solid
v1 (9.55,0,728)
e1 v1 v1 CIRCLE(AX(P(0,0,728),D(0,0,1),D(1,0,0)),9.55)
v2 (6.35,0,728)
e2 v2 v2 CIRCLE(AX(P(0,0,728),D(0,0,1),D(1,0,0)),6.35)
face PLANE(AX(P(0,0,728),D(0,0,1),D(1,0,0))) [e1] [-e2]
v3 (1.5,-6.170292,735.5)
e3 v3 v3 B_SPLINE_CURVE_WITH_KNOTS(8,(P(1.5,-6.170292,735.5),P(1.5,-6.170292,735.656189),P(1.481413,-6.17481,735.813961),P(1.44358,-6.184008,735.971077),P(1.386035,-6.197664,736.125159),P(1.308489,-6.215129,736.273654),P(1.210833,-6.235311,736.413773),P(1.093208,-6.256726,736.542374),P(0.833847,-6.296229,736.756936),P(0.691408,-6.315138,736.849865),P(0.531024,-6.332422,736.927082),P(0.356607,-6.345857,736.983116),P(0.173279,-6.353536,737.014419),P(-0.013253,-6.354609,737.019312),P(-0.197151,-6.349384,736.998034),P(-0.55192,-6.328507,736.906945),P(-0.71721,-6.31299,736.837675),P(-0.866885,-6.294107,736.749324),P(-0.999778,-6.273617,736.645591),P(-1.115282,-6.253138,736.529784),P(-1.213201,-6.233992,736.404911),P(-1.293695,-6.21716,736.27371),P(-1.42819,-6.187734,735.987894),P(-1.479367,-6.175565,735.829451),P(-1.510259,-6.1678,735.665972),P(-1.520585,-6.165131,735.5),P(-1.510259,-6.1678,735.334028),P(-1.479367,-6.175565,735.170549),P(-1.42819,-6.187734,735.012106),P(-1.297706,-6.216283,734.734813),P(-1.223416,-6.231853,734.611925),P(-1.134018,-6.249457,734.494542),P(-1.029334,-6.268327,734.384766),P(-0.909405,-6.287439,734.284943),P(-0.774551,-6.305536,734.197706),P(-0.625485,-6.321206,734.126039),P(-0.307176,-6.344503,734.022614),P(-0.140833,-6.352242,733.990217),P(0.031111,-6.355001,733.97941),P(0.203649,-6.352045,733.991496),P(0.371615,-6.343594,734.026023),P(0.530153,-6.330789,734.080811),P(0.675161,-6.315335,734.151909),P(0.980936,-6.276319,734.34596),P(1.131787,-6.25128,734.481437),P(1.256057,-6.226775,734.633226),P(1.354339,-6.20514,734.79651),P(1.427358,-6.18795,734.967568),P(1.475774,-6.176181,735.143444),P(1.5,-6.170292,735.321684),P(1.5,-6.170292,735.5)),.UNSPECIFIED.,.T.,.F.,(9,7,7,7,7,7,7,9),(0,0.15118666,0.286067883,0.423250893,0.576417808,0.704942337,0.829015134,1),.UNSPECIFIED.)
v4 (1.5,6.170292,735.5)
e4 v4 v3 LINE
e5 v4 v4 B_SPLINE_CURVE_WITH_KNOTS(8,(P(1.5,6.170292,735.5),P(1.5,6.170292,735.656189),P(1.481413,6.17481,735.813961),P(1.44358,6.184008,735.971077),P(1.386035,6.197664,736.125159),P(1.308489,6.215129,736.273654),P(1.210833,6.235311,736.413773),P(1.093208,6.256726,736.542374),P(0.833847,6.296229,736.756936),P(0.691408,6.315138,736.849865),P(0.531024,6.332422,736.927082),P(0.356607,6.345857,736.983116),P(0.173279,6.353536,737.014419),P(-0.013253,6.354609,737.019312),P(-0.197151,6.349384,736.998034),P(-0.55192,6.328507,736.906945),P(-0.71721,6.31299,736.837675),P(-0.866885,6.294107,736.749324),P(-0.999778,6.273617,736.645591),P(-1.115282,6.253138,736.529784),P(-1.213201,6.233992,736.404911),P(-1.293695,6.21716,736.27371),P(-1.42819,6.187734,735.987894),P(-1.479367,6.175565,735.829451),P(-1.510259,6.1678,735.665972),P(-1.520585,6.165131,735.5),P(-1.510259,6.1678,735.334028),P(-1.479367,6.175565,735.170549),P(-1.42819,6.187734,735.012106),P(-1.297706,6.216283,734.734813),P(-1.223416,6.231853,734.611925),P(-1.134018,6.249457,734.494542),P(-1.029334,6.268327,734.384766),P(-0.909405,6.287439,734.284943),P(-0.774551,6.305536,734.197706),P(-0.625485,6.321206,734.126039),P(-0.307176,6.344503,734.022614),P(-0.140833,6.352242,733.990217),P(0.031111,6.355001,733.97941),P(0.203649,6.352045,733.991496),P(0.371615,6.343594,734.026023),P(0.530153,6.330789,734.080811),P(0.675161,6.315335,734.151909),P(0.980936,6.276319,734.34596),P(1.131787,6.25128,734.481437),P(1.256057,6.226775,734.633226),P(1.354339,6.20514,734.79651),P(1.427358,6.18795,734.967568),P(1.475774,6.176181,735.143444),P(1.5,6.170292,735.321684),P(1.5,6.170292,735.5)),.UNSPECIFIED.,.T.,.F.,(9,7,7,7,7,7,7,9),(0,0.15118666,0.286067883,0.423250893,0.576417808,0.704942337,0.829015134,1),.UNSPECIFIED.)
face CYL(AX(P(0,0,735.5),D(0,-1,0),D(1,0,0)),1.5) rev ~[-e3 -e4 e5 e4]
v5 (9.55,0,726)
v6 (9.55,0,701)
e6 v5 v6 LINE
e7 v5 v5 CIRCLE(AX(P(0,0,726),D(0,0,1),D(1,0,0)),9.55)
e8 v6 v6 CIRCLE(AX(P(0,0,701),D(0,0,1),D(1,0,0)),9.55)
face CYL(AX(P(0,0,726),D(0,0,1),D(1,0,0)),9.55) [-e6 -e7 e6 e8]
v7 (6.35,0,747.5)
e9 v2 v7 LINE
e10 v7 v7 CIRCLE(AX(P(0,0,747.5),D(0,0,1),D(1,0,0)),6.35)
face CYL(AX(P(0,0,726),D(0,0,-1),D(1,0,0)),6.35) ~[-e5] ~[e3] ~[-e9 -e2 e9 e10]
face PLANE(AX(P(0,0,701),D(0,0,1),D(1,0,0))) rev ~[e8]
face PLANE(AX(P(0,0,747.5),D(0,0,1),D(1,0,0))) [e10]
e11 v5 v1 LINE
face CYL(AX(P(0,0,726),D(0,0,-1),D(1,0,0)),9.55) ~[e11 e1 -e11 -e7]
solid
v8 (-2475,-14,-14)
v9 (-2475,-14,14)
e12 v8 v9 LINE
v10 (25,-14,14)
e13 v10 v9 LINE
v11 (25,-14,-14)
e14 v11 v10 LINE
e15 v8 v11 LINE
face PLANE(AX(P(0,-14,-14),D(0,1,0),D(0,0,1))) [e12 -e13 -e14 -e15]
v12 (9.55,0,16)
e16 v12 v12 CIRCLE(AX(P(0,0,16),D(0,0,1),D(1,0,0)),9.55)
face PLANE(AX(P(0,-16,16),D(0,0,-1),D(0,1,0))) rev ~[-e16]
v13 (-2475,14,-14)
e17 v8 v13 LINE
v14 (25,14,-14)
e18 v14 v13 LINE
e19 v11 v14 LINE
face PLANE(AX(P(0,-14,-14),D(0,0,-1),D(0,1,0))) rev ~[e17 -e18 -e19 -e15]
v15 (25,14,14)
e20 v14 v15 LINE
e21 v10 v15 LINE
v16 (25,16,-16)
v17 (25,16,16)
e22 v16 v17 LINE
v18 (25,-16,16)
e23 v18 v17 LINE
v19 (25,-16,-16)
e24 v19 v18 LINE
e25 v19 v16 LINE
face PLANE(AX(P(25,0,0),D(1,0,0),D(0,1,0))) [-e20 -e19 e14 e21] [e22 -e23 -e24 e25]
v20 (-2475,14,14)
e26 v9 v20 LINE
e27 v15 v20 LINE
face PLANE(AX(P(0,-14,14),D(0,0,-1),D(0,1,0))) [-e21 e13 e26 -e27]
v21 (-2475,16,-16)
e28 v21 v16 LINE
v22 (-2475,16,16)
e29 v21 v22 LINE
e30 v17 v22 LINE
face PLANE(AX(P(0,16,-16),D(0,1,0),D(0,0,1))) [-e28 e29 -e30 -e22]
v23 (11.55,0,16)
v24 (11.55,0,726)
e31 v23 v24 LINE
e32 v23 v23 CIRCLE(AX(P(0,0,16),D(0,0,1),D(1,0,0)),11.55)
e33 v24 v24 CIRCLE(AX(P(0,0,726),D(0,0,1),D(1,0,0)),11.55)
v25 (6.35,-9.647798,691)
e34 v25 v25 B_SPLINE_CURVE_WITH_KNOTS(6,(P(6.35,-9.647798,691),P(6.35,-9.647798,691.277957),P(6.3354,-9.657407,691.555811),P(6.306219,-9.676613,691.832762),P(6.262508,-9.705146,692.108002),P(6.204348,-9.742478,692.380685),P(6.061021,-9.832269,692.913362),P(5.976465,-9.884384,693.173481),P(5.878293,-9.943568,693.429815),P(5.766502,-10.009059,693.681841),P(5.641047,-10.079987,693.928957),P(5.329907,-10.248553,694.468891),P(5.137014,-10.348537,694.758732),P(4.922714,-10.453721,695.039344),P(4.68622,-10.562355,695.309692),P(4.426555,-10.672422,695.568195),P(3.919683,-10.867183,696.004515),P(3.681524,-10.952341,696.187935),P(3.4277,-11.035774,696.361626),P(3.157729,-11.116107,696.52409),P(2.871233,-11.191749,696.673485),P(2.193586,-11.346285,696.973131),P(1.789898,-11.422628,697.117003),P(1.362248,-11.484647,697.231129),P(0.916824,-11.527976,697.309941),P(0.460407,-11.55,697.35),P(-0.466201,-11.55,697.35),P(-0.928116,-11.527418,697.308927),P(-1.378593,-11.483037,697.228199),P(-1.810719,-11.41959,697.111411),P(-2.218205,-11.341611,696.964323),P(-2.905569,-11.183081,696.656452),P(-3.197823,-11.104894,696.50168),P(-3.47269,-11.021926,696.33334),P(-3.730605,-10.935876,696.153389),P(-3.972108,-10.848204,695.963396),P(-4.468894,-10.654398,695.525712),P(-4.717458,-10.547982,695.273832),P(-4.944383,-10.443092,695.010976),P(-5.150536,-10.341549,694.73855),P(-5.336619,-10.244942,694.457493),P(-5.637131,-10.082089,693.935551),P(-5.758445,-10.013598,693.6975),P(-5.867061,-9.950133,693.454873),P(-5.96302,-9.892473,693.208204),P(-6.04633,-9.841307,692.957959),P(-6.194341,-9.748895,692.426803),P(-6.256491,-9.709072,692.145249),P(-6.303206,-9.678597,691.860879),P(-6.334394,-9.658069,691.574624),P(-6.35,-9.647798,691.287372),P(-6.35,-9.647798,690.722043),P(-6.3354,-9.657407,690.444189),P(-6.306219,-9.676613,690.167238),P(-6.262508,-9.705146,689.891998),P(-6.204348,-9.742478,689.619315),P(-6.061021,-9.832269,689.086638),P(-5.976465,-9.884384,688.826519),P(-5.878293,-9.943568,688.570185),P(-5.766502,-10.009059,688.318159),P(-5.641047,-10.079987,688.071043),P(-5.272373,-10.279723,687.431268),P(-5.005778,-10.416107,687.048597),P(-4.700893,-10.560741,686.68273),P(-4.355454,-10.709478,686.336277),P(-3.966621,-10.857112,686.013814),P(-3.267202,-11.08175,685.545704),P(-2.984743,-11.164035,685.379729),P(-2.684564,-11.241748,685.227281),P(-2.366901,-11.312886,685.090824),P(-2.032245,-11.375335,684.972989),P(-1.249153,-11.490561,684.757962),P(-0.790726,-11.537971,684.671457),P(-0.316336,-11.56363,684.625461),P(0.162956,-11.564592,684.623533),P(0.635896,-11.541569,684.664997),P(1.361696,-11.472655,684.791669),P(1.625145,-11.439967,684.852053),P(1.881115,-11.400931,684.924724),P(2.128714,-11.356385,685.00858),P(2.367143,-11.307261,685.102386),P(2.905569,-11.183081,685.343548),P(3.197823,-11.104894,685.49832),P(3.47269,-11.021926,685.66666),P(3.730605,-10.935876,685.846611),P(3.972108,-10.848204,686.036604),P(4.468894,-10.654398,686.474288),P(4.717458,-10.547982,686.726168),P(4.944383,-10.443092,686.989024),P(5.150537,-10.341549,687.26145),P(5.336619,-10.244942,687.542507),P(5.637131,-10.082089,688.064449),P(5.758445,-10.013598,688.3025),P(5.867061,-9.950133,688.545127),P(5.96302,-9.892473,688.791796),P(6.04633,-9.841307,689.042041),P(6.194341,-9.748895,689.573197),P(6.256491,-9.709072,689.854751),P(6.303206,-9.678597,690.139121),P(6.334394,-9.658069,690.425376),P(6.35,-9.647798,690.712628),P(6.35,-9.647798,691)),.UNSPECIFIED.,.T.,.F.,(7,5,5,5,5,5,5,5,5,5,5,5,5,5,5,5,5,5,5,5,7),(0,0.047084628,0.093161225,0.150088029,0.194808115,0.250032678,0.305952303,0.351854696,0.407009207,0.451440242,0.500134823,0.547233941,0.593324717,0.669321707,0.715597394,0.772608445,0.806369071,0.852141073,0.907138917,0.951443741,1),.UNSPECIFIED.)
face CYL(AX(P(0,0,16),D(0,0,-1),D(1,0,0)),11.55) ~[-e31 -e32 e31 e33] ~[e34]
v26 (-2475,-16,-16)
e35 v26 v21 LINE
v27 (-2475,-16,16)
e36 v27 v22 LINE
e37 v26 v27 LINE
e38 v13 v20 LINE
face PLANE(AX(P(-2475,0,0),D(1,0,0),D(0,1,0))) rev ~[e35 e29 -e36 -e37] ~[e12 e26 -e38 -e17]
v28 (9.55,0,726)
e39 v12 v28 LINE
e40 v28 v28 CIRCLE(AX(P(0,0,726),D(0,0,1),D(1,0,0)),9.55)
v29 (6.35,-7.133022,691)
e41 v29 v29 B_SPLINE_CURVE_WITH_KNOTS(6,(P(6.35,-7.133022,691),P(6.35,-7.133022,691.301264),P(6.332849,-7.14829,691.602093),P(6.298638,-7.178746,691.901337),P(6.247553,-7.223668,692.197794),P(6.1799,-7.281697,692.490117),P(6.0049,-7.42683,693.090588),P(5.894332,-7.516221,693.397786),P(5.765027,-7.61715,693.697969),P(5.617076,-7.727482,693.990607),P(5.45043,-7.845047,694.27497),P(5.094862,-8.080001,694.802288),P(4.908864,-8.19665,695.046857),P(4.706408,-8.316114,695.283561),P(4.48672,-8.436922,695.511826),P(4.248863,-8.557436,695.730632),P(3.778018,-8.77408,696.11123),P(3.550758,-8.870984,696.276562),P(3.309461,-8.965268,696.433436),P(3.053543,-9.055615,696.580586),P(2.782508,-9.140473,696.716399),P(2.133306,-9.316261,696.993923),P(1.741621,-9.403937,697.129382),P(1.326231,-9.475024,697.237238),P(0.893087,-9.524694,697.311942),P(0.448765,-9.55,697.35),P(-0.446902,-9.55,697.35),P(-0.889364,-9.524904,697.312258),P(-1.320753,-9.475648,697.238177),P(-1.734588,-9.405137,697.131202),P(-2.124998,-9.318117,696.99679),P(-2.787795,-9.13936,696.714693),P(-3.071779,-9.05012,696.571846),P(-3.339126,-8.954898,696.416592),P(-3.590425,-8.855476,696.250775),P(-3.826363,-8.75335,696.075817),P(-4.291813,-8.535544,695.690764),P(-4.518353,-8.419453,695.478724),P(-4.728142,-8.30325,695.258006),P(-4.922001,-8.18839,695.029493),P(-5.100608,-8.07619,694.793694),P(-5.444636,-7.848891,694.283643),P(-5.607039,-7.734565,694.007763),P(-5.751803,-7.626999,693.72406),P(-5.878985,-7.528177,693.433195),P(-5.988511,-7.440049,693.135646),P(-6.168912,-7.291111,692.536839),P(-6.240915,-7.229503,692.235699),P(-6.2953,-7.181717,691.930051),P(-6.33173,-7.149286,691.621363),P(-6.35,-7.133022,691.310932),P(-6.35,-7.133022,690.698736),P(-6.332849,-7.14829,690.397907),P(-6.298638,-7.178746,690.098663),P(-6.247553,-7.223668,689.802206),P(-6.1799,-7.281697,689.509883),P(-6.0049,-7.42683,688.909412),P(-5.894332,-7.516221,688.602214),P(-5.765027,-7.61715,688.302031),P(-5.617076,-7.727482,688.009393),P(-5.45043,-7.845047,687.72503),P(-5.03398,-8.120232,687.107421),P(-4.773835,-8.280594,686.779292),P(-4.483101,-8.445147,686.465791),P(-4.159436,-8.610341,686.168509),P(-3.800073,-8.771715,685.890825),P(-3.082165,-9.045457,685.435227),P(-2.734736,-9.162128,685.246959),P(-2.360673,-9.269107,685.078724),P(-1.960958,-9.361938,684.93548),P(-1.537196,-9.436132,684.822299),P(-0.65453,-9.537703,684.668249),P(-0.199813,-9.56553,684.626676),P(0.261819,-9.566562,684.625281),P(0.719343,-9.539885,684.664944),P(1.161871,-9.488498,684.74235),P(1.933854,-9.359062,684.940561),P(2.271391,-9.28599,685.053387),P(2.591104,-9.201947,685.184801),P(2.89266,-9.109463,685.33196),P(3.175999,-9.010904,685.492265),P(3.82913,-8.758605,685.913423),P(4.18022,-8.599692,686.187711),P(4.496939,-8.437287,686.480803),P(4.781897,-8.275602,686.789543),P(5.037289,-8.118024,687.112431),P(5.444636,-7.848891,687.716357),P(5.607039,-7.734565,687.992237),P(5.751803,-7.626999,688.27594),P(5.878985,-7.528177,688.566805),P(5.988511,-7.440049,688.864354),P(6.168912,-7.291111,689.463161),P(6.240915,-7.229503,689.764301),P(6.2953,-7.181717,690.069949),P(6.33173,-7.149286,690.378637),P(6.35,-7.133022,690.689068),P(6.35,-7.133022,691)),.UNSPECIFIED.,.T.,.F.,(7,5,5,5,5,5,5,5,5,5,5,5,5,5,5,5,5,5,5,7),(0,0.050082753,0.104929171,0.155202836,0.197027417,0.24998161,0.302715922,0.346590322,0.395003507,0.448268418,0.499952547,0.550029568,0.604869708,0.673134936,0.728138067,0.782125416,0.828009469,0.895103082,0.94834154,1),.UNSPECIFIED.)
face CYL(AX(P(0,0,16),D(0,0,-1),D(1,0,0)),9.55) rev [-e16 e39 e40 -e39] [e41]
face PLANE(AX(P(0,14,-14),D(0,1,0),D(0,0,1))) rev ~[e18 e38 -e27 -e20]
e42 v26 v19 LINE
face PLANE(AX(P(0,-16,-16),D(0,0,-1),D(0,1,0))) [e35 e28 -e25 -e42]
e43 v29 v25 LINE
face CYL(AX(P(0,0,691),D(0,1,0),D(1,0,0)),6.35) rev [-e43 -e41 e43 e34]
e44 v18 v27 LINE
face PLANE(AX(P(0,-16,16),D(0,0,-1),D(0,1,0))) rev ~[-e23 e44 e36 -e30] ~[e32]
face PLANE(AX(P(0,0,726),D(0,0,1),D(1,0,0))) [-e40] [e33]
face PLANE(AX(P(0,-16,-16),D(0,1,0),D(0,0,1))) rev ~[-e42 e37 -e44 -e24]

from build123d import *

# Parameters (mm, degrees)
F0_W      = 32
F0_H      = 32
F0_W_2    = 28
F0_H_2    = 28
F1_DEPTH  = 25
F2_DEPTH  = 2475
F3_R      = 11.55
F3_R_2    = 9.55
F4_DEPTH  = 710
F5_R      = 9.55
F6_DEPTH  = 25
F7_R      = 6.35
F8_DEPTH  = 21.5
F9_R      = 1.5
F10_DEPTH = 6.5
F11_R     = 9.55
F11_R_2   = 6.35
F12_DEPTH = 2
F13_R     = 6.35
F14_DEPTH = 25


with BuildPart() as f1:
    # F0 (on Right) → F1 (new body)
    with BuildSketch(Plane.YZ):
        Rectangle(F0_W, F0_H)
        Rectangle(F0_W_2, F0_H_2, mode=Mode.SUBTRACT)
    extrude(amount=F1_DEPTH)

    # F0 (on Right) → F2 (join)
    with BuildSketch(Plane.YZ):
        Rectangle(F0_W, F0_H)
        Rectangle(F0_W_2, F0_H_2, mode=Mode.SUBTRACT)
    extrude(amount=-F2_DEPTH)

    # F3 (on face) → F4 (join)
    with BuildSketch(Plane.XY.offset(16)):
        Circle(F3_R)
        Circle(F3_R_2, mode=Mode.SUBTRACT)
    extrude(amount=F4_DEPTH)

    # F13 (on Front) → F14 (cut)
    with BuildSketch(Plane.XZ):
        with Locations((0, 691)):
            Circle(F13_R)
    extrude(amount=F14_DEPTH, mode=Mode.SUBTRACT)


with BuildPart() as f6:
    # F5 (on face) → F6 (new body)
    with BuildSketch(Plane.XY.offset(726)):
        Circle(F5_R)
    extrude(amount=-F6_DEPTH)

    # F7 (on face) → F8 (join)
    with BuildSketch(Plane.XY.offset(726)):
        Circle(F7_R)
    extrude(amount=F8_DEPTH)

    # F9 (on Front) → F10 (cut, symmetric)
    with BuildSketch(Plane.XZ):
        with Locations((0, 735.5)):
            Circle(F9_R)
    extrude(amount=F10_DEPTH, both=True, mode=Mode.SUBTRACT)

    # F11 (on face) → F12 (join)
    with BuildSketch(Plane.XY.offset(726)):
        Circle(F11_R)
        Circle(F11_R_2, mode=Mode.SUBTRACT)
    extrude(amount=F12_DEPTH)


solid = Compound([f1.part, f6.part])
